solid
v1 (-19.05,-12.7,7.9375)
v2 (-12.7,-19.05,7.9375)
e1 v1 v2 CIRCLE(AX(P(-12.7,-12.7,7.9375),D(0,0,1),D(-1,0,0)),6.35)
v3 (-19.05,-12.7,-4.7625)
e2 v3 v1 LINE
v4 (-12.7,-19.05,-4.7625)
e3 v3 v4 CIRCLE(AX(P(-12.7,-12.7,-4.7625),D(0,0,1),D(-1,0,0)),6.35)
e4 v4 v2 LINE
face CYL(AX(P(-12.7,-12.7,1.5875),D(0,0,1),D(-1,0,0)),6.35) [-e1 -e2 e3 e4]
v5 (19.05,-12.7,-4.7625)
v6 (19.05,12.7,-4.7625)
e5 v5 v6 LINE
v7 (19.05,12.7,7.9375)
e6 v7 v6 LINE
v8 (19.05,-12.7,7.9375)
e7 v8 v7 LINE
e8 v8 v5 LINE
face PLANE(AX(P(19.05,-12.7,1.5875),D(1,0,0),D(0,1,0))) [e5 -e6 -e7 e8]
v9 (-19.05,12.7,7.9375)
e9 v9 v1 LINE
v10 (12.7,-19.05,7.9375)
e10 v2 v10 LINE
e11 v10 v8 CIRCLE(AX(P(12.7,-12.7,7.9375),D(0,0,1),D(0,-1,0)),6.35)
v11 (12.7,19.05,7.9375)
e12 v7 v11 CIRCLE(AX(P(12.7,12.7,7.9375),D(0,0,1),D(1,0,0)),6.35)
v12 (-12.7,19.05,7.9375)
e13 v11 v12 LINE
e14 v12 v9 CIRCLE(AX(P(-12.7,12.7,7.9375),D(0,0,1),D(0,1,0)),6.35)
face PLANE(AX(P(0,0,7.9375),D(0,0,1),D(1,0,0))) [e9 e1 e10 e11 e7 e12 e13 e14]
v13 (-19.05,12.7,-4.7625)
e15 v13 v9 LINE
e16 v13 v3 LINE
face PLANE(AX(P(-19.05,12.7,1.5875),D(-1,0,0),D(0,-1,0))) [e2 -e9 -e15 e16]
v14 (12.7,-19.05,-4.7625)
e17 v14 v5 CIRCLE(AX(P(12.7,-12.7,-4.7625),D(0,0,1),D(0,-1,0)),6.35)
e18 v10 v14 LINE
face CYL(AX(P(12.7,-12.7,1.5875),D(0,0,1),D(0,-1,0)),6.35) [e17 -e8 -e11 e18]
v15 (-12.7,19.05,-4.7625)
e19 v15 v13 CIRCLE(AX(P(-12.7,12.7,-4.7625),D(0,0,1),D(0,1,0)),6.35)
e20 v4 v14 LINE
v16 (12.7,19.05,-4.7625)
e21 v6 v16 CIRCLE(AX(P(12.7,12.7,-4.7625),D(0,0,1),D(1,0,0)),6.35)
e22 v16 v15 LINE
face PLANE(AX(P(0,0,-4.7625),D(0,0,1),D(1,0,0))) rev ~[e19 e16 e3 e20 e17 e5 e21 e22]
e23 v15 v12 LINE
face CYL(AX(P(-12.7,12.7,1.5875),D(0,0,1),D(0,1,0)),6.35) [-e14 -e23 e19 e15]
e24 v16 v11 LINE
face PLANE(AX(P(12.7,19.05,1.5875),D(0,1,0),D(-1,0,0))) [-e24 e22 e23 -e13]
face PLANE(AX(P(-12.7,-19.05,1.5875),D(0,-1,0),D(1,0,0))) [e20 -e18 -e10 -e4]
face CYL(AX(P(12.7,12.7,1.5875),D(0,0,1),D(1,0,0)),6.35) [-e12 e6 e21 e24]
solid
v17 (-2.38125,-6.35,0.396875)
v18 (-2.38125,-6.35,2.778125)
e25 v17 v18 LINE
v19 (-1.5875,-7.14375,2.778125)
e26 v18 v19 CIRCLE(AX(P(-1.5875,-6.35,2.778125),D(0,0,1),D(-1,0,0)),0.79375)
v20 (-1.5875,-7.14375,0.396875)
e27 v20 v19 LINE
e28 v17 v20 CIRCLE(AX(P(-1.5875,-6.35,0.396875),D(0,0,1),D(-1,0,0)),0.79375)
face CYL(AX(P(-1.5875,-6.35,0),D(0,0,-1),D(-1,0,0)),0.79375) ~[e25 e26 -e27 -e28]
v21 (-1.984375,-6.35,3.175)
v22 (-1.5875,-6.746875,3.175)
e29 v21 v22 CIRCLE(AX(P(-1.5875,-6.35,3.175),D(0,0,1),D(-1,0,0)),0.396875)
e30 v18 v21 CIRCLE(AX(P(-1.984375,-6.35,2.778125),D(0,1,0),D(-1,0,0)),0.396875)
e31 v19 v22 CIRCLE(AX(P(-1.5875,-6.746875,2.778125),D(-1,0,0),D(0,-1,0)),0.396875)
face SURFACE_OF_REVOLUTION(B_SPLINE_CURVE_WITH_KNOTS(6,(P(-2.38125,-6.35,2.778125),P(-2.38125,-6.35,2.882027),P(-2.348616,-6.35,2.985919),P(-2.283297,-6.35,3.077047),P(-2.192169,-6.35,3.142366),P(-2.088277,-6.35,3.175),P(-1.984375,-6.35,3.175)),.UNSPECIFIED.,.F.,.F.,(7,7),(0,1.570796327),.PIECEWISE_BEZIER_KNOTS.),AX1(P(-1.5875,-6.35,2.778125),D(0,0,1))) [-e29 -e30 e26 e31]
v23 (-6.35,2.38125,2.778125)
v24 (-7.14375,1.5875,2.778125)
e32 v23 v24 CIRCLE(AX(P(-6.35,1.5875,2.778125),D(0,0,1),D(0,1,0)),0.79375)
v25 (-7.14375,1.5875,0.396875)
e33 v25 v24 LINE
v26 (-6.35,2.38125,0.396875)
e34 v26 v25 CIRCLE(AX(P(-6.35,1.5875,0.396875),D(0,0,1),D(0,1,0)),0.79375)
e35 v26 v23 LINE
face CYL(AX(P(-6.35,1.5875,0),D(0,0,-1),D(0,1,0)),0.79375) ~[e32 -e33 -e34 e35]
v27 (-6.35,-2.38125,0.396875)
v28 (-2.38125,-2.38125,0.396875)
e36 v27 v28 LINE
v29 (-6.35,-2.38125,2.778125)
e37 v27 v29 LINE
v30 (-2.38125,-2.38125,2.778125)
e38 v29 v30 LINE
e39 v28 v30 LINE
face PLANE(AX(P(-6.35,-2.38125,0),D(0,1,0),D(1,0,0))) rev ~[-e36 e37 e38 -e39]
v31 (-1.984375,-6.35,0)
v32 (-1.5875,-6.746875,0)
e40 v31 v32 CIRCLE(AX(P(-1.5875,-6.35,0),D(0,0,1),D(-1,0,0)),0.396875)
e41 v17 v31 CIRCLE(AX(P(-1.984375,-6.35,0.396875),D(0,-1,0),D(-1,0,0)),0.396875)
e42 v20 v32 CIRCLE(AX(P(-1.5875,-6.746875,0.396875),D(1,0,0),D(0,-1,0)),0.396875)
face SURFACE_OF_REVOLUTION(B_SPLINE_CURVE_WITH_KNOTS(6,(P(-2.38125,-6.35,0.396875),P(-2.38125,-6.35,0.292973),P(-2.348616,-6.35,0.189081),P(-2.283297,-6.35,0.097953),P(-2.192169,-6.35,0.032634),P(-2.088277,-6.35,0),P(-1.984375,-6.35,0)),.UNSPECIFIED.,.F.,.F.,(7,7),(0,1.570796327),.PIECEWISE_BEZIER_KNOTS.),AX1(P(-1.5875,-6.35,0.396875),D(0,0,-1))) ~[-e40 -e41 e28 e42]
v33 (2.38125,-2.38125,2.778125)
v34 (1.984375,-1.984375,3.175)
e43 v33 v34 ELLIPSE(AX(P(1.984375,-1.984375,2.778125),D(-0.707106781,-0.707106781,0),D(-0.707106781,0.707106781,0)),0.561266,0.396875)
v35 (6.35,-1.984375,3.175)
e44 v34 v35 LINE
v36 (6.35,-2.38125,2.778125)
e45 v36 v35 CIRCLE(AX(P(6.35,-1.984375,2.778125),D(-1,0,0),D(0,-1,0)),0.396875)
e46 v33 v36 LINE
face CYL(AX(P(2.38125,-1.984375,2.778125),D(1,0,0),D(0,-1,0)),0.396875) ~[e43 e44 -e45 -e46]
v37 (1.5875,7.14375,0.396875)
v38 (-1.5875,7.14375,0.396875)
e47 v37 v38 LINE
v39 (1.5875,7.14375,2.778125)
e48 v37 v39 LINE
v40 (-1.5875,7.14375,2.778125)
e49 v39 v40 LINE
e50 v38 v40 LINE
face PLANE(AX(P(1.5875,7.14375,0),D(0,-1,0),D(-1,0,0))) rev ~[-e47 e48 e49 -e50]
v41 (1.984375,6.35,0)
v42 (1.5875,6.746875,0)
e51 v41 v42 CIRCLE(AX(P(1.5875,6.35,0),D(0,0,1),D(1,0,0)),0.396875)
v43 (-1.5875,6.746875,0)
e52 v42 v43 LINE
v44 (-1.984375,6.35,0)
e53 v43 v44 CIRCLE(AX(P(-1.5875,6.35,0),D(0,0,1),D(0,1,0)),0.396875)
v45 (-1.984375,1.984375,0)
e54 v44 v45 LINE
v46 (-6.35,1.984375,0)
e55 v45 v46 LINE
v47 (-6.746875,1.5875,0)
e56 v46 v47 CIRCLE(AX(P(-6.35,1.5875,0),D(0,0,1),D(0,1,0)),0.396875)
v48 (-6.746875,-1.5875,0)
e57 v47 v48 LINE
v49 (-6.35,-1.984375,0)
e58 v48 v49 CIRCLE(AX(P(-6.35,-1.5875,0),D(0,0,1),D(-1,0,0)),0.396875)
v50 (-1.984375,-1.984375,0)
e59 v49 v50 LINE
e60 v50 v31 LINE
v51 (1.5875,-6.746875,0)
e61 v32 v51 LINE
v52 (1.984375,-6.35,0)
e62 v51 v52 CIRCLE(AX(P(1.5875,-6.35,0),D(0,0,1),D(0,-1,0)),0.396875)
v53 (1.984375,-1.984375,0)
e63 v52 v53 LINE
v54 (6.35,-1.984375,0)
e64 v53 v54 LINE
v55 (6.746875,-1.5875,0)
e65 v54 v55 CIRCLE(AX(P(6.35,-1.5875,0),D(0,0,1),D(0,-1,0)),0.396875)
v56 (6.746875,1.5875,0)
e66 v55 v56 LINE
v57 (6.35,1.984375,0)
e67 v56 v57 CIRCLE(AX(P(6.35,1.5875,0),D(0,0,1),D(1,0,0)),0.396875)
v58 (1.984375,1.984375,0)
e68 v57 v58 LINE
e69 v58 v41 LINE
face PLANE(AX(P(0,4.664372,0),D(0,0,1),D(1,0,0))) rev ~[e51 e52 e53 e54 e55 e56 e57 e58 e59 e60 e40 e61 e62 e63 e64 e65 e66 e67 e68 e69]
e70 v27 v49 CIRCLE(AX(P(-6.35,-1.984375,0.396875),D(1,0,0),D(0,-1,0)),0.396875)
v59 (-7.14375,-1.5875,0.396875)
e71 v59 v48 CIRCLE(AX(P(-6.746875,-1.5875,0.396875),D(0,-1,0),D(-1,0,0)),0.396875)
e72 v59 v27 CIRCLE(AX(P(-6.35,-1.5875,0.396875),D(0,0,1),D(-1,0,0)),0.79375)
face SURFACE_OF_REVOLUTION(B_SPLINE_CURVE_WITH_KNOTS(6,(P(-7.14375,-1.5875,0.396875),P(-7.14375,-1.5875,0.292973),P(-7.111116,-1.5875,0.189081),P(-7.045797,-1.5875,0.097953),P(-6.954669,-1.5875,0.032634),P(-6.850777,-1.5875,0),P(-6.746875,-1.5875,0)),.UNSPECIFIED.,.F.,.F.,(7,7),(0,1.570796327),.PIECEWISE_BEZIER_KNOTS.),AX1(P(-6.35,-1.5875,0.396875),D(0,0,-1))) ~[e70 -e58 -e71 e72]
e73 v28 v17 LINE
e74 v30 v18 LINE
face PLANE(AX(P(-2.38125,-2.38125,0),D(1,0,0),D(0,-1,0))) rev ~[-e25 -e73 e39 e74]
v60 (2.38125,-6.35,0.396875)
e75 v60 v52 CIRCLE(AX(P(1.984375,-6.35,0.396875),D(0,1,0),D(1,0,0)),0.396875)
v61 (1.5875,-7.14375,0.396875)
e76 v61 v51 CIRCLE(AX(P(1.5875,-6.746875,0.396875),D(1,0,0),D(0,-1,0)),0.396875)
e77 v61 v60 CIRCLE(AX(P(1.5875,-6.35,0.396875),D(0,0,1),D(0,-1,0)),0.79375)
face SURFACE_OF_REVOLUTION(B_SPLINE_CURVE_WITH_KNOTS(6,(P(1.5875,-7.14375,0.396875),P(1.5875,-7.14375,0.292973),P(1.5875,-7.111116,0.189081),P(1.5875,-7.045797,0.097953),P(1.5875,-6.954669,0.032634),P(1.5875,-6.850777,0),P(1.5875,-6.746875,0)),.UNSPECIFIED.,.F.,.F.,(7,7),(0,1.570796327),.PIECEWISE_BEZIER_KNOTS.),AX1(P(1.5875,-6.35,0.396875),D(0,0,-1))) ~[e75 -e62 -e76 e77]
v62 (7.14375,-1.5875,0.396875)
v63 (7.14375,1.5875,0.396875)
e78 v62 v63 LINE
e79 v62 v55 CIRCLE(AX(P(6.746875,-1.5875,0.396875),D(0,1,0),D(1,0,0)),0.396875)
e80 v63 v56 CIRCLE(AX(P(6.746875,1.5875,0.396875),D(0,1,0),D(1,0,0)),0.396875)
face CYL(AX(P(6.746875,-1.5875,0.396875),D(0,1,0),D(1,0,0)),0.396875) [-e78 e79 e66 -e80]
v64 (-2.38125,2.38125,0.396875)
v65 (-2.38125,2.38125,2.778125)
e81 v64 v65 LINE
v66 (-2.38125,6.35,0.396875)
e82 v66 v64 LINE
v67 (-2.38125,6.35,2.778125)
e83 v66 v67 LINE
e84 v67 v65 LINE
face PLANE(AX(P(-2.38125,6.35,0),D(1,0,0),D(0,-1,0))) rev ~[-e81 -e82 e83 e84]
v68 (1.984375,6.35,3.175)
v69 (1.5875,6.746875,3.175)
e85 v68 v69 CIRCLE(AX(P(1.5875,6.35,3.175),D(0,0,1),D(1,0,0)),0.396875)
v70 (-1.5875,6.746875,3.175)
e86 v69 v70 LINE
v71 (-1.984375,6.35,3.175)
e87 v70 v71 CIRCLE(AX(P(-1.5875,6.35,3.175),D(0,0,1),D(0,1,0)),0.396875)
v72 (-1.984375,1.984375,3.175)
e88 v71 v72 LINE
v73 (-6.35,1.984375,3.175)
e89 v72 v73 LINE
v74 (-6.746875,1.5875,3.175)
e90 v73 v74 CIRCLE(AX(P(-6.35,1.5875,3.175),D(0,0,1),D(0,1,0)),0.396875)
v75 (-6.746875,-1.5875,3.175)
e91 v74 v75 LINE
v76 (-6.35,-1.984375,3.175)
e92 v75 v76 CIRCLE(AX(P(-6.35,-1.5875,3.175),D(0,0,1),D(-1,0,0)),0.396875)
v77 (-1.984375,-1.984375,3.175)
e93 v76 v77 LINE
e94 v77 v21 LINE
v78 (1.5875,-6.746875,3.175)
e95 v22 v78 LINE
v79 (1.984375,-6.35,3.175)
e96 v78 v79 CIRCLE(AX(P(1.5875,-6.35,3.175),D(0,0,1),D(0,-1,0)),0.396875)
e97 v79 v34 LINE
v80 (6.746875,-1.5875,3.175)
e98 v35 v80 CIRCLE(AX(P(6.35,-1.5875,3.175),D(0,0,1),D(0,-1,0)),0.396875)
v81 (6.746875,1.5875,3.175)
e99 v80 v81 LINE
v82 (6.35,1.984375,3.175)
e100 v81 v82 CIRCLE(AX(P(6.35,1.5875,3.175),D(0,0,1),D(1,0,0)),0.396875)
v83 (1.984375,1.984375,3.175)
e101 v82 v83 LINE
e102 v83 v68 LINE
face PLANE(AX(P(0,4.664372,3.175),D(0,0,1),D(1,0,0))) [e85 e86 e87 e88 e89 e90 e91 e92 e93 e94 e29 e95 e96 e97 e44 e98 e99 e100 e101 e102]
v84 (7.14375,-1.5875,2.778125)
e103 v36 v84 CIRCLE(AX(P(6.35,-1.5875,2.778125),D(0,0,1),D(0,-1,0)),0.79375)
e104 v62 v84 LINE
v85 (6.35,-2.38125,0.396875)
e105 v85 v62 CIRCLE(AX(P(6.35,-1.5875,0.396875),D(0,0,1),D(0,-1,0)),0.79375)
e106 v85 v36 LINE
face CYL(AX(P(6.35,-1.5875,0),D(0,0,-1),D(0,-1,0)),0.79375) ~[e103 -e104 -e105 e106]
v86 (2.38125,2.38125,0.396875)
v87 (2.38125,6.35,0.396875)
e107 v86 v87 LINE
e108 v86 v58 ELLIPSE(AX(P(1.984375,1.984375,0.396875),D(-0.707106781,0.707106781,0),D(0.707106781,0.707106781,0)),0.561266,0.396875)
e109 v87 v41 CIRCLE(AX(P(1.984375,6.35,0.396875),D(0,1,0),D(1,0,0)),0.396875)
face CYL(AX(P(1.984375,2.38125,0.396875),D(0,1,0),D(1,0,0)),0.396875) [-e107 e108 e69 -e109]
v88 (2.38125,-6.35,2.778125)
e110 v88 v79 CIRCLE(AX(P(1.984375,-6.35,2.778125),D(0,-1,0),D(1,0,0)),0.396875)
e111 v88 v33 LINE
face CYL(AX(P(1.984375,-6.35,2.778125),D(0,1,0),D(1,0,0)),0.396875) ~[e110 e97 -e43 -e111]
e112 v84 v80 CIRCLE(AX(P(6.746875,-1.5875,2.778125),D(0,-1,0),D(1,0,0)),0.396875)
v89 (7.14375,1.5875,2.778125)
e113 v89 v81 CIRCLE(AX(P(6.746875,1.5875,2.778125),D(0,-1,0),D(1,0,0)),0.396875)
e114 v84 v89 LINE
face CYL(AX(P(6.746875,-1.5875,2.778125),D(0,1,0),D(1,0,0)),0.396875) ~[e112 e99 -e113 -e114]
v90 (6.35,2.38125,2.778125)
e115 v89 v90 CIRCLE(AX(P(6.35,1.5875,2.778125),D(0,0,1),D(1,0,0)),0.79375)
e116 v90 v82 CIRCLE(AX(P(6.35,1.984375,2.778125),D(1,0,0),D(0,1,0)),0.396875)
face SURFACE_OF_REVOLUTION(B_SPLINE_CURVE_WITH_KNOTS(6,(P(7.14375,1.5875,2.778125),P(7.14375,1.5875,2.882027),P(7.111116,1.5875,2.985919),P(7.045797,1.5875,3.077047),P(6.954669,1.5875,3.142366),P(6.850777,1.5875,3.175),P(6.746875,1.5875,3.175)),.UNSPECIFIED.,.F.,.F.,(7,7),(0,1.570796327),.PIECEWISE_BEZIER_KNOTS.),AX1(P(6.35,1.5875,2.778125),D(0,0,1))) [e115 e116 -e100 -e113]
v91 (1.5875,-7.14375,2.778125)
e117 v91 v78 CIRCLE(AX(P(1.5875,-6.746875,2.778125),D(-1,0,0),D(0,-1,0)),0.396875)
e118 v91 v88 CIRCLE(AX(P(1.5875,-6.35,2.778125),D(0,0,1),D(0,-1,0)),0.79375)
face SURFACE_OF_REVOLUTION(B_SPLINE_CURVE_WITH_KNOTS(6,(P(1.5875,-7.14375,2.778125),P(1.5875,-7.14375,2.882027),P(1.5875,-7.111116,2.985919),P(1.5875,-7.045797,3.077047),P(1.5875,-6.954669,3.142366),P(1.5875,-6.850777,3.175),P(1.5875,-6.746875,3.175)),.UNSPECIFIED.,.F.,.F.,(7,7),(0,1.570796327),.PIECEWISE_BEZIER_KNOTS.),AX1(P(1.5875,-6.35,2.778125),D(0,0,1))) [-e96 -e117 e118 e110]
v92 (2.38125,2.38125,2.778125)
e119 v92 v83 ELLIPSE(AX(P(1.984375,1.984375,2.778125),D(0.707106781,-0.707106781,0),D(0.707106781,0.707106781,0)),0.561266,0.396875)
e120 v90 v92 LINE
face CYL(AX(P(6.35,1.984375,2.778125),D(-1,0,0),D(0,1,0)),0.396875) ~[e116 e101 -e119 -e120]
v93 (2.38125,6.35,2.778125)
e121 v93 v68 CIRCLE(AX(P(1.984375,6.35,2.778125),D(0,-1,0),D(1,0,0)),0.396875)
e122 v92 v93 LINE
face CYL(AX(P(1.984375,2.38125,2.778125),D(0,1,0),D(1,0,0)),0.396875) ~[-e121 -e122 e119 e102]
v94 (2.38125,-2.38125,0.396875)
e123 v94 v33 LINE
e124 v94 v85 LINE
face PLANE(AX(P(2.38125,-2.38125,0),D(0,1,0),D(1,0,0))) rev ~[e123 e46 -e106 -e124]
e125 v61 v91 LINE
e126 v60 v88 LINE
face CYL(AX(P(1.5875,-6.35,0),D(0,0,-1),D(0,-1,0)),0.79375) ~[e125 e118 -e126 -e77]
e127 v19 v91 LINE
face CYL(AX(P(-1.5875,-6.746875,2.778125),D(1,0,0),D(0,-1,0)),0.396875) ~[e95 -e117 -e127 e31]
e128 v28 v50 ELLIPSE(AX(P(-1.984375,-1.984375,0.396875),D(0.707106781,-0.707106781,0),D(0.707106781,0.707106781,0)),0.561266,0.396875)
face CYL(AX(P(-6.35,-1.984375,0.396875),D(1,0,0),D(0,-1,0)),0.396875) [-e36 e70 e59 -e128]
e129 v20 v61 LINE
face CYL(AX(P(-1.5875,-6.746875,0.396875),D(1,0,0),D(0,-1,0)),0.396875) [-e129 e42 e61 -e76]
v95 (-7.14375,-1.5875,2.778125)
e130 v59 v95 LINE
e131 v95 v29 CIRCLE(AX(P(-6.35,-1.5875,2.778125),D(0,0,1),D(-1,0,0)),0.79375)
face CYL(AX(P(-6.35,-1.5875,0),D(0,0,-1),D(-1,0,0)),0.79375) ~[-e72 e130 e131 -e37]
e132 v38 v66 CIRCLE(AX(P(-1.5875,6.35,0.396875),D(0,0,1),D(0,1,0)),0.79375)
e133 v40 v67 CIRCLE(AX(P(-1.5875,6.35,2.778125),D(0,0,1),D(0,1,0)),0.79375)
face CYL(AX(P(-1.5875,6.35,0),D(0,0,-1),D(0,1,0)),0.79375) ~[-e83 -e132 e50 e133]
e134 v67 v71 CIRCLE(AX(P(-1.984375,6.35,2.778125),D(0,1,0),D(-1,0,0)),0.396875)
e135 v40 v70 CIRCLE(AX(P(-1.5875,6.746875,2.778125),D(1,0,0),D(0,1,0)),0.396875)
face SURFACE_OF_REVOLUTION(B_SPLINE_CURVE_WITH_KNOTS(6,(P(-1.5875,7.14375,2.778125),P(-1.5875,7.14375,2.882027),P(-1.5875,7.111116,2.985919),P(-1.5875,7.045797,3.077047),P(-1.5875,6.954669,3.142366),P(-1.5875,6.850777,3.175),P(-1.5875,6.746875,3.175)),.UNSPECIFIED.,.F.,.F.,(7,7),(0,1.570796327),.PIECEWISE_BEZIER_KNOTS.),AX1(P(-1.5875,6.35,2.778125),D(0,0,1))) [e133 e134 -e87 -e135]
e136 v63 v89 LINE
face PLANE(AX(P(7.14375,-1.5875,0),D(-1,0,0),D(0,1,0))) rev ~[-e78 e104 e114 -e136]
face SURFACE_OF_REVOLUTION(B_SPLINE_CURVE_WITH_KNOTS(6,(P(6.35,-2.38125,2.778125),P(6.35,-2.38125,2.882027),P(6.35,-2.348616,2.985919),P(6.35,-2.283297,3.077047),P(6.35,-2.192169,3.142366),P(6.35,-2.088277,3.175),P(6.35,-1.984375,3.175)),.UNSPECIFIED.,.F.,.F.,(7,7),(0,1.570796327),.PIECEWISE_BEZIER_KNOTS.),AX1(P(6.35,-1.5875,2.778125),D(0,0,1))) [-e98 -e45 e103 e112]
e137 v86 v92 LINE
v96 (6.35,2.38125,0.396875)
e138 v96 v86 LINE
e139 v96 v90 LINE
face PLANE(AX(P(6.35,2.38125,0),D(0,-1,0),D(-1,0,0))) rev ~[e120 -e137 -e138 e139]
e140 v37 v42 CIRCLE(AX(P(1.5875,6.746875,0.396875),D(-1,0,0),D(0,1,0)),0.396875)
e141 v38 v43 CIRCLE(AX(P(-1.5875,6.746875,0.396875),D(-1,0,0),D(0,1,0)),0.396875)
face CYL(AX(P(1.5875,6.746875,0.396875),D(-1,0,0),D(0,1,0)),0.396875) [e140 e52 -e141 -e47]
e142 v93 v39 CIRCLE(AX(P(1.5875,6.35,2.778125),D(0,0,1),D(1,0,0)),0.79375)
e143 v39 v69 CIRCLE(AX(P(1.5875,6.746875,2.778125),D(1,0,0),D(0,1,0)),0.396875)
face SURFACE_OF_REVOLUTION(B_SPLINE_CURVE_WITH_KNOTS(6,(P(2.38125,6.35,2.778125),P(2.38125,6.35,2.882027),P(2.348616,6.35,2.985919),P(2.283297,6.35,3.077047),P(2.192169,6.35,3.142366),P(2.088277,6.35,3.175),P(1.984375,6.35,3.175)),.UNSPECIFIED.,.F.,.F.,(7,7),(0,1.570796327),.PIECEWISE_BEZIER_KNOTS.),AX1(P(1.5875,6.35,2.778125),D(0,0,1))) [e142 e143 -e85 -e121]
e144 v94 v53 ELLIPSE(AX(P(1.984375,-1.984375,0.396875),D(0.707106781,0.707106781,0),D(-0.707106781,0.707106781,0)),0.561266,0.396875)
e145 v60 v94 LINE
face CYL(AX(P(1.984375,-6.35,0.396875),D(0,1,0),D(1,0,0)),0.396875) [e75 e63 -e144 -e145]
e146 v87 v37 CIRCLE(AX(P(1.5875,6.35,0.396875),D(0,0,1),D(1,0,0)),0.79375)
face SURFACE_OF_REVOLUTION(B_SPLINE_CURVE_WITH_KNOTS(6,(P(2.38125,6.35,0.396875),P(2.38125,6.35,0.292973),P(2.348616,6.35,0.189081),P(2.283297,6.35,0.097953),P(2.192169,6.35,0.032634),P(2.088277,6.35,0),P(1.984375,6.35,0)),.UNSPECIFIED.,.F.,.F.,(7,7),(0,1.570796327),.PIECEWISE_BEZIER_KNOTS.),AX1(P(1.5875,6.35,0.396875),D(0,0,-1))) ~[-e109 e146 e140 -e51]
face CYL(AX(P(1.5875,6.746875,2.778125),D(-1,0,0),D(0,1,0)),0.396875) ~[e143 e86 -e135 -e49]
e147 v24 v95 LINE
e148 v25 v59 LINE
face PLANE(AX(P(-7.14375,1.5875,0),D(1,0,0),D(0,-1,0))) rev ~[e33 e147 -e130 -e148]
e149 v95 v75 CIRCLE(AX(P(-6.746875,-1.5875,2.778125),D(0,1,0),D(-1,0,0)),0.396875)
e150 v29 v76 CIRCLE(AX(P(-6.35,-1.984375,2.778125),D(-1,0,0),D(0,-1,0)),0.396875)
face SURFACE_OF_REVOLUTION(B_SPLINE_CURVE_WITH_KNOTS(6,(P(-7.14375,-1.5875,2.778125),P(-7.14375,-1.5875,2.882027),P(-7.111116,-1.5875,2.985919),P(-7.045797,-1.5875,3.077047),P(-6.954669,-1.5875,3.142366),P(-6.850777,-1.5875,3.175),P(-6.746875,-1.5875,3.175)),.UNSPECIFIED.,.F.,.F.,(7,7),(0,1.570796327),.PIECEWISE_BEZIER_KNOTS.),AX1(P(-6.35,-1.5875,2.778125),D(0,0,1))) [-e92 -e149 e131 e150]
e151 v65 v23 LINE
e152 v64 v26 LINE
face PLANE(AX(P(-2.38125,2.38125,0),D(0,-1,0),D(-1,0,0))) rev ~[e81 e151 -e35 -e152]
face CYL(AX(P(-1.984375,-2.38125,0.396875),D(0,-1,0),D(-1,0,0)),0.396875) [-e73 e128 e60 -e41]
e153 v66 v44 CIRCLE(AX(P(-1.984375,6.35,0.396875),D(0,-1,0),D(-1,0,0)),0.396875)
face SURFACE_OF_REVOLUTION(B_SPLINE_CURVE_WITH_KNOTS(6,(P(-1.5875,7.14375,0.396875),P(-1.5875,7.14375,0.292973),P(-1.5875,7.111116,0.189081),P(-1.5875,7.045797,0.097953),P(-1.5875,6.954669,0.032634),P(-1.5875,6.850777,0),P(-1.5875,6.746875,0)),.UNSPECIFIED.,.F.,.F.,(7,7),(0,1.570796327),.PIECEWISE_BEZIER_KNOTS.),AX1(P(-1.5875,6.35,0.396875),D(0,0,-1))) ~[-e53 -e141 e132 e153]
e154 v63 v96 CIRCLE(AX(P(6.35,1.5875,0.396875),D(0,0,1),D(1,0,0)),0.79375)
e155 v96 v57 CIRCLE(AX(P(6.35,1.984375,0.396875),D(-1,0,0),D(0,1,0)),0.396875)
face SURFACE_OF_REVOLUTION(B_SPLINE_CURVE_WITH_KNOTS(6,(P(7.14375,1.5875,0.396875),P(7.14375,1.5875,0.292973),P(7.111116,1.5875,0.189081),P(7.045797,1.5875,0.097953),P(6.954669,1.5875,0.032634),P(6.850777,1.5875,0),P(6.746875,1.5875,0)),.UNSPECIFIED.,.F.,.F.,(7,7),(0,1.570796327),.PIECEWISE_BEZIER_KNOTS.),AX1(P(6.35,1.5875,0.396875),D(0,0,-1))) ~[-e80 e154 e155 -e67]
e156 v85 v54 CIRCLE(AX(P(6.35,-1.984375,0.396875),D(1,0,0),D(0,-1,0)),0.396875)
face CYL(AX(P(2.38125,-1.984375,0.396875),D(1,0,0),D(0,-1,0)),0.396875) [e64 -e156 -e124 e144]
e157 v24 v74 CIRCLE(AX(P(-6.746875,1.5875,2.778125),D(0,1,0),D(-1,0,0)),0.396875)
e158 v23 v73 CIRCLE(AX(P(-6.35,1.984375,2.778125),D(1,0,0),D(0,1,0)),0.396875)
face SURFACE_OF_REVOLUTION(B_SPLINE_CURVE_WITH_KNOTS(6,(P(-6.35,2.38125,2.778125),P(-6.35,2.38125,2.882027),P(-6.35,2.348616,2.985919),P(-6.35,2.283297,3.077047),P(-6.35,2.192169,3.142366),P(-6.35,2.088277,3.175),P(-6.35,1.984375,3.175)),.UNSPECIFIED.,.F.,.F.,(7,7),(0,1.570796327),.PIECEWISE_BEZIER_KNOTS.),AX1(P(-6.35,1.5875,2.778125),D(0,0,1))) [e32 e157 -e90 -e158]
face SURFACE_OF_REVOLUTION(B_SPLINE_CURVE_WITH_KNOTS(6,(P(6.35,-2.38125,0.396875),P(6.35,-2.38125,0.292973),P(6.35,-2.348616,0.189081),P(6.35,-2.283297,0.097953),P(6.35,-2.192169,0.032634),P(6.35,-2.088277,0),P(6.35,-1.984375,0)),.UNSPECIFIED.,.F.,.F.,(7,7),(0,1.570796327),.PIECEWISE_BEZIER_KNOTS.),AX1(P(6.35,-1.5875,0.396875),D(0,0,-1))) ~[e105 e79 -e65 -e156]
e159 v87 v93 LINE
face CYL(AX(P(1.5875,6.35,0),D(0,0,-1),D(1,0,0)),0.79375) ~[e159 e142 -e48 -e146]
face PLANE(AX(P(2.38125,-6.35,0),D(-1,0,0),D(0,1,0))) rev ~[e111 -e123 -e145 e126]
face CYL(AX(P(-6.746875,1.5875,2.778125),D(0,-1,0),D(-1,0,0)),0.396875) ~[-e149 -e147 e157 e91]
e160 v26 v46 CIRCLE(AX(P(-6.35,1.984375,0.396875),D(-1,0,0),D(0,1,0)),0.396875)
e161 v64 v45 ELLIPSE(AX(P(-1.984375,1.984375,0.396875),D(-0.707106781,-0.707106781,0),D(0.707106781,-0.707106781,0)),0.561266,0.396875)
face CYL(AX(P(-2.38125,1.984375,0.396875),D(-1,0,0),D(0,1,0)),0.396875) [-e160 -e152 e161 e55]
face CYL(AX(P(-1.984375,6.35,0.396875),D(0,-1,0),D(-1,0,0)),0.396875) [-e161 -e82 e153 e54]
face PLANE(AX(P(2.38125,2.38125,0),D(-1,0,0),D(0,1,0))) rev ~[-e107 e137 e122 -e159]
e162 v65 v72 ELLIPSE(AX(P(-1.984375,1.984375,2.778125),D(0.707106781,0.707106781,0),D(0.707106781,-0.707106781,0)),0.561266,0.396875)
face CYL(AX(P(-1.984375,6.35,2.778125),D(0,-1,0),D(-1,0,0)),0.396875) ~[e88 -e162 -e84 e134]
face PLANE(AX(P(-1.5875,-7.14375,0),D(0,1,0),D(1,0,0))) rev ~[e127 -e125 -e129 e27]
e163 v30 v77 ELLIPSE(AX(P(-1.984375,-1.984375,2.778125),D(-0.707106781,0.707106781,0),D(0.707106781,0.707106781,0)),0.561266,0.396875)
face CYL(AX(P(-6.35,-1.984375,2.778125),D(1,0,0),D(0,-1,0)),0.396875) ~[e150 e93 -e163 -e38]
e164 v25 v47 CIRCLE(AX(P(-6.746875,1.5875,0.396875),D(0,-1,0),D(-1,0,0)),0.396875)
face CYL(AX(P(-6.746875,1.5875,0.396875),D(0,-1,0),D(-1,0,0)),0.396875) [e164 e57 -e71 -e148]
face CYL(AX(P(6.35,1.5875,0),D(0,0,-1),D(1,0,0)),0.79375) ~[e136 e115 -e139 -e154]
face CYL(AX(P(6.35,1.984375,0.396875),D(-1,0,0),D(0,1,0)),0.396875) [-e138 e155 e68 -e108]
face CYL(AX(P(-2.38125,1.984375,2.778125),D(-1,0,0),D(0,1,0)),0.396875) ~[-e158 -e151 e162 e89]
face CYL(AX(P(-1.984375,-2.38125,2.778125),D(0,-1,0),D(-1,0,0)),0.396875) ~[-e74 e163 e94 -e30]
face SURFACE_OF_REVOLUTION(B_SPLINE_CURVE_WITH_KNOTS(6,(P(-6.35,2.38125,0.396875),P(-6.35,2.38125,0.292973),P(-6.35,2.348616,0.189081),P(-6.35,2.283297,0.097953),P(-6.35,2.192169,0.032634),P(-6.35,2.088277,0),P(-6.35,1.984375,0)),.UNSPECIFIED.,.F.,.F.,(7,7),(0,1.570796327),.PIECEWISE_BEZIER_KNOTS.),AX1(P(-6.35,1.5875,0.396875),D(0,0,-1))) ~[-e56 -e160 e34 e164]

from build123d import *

# Parameters (mm, degrees)
F0_W          = 4.7625
F0_H          = 4.7625
F1_DEPTH      = 3.175
F2_R          = 0.396875
F5_DEPTH      = 6.35
F5_DEPTH_BACK = 6.35


# Not quite as in the source:
# - a length typed as a fraction of an inch, garbled in the dataset ("3 / 203.2 mm" for 3/8 in), is restored


with BuildPart() as f1:
    # F0 (on Top) → F1 (new body)
    with BuildSketch(Plane.XY):
        with BuildLine():
            ThreePointArc((2.38125, 6.35), (2.1487660076, 6.9112660076), (1.5875, 7.14375))
            Line((1.5875, 7.14375), (-1.5875, 7.14375))
            ThreePointArc((-1.5875, 7.14375), (-2.1487660076, 6.9112660076), (-2.38125, 6.35))
            Line((-2.38125, 6.35), (-2.38125, 2.38125))
            Line((-2.38125, 2.38125), (2.38125, 2.38125))
            Line((2.38125, 2.38125), (2.38125, 6.35))
        make_face()
        with BuildLine():
            Line((6.35, 2.38125), (2.38125, 2.38125))
            Line((2.38125, 2.38125), (2.38125, -2.38125))
            Line((2.38125, -2.38125), (6.35, -2.38125))
            ThreePointArc((6.35, -2.38125), (6.9112660076, -2.1487660076), (7.14375, -1.5875))
            Line((7.14375, -1.5875), (7.14375, 1.5875))
            ThreePointArc((7.14375, 1.5875), (6.9112660076, 2.1487660076), (6.35, 2.38125))
        make_face()
        Rectangle(F0_W, F0_H)
        with BuildLine():
            Line((-2.38125, -2.38125), (-2.38125, 2.38125))
            Line((-2.38125, 2.38125), (-6.35, 2.38125))
            ThreePointArc((-6.35, 2.38125), (-6.9112660076, 2.1487660076), (-7.14375, 1.5875))
            Line((-7.14375, 1.5875), (-7.14375, -1.5875))
            ThreePointArc((-7.14375, -1.5875), (-6.9112660076, -2.1487660076), (-6.35, -2.38125))
            Line((-6.35, -2.38125), (-2.38125, -2.38125))
        make_face()
        with BuildLine():
            Line((2.38125, -6.35), (2.38125, -2.38125))
            Line((2.38125, -2.38125), (-2.38125, -2.38125))
            Line((-2.38125, -2.38125), (-2.38125, -6.35))
            ThreePointArc((-2.38125, -6.35), (-2.1487660076, -6.9112660076), (-1.5875, -7.14375))
            Line((-1.5875, -7.14375), (1.5875, -7.14375))
            ThreePointArc((1.5875, -7.14375), (2.1487660076, -6.9112660076), (2.38125, -6.35))
        make_face()
    extrude(amount=F1_DEPTH)

    # F2
    f2_edges = [f1.edges().sort_by_distance(p)[0] for p in [
        (2.38125, 4.365625, 3.175),
        (2.148766, 6.911266, 3.175),
        (0, 7.14375, 3.175),
        (-2.148766, 6.911266, 3.175),
        (-2.38125, 4.365625, 3.175),
        (-4.365625, 2.38125, 3.175),
        (-6.911266, 2.148766, 3.175),
        (-7.14375, 0, 3.175),
        (-6.911266, -2.148766, 3.175),
        (-4.365625, -2.38125, 3.175),
        (-2.38125, -4.365625, 3.175),
        (-2.148766, -6.911266, 3.175),
        (0, -7.14375, 3.175),
        (2.148766, -6.911266, 3.175),
        (2.38125, -4.365625, 3.175),
        (4.365625, -2.38125, 3.175),
        (6.911266, -2.148766, 3.175),
        (7.14375, 0, 3.175),
        (6.911266, 2.148766, 3.175),
        (4.365625, 2.38125, 3.175),
        (2.38125, 4.365625, 0),
        (2.148766, 6.911266, 0),
        (0, 7.14375, 0),
        (-2.148766, 6.911266, 0),
        (-2.38125, 4.365625, 0),
        (-4.365625, 2.38125, 0),
        (-6.911266, 2.148766, 0),
        (-7.14375, 0, 0),
        (-6.911266, -2.148766, 0),
        (-4.365625, -2.38125, 0),
        (-2.38125, -4.365625, 0),
        (-2.148766, -6.911266, 0),
        (0, -7.14375, 0),
        (2.148766, -6.911266, 0),
        (2.38125, -4.365625, 0),
        (4.365625, -2.38125, 0),
        (6.911266, -2.148766, 0),
        (7.14375, 0, 0),
        (6.911266, 2.148766, 0),
        (4.365625, 2.38125, 0),
    ]]
    fillet(f2_edges, radius=F2_R)


with BuildPart() as f5:
    # F4 (on offset) → F5 (new body, two sides)
    with BuildSketch(Plane.XY.offset(1.5875)) as f5_sk:
        with BuildLine():
            ThreePointArc((19.05, 12.7), (17.1901280605, 17.1901280605), (12.7, 19.05))
            Line((12.7, 19.05), (-12.7, 19.05))
            ThreePointArc((-12.7, 19.05), (-17.1901280605, 17.1901280605), (-19.05, 12.7))
            Line((-19.05, 12.7), (-19.05, -12.7))
            ThreePointArc((-19.05, -12.7), (-17.1901280605, -17.1901280605), (-12.7, -19.05))
            Line((-12.7, -19.05), (12.7, -19.05))
            ThreePointArc((12.7, -19.05), (17.1901280605, -17.1901280605), (19.05, -12.7))
            Line((19.05, -12.7), (19.05, 12.7))
        make_face()
    extrude(amount=F5_DEPTH)
    extrude(f5_sk.sketch, amount=-F5_DEPTH_BACK)


solid = Compound([f1.part, f5.part])
